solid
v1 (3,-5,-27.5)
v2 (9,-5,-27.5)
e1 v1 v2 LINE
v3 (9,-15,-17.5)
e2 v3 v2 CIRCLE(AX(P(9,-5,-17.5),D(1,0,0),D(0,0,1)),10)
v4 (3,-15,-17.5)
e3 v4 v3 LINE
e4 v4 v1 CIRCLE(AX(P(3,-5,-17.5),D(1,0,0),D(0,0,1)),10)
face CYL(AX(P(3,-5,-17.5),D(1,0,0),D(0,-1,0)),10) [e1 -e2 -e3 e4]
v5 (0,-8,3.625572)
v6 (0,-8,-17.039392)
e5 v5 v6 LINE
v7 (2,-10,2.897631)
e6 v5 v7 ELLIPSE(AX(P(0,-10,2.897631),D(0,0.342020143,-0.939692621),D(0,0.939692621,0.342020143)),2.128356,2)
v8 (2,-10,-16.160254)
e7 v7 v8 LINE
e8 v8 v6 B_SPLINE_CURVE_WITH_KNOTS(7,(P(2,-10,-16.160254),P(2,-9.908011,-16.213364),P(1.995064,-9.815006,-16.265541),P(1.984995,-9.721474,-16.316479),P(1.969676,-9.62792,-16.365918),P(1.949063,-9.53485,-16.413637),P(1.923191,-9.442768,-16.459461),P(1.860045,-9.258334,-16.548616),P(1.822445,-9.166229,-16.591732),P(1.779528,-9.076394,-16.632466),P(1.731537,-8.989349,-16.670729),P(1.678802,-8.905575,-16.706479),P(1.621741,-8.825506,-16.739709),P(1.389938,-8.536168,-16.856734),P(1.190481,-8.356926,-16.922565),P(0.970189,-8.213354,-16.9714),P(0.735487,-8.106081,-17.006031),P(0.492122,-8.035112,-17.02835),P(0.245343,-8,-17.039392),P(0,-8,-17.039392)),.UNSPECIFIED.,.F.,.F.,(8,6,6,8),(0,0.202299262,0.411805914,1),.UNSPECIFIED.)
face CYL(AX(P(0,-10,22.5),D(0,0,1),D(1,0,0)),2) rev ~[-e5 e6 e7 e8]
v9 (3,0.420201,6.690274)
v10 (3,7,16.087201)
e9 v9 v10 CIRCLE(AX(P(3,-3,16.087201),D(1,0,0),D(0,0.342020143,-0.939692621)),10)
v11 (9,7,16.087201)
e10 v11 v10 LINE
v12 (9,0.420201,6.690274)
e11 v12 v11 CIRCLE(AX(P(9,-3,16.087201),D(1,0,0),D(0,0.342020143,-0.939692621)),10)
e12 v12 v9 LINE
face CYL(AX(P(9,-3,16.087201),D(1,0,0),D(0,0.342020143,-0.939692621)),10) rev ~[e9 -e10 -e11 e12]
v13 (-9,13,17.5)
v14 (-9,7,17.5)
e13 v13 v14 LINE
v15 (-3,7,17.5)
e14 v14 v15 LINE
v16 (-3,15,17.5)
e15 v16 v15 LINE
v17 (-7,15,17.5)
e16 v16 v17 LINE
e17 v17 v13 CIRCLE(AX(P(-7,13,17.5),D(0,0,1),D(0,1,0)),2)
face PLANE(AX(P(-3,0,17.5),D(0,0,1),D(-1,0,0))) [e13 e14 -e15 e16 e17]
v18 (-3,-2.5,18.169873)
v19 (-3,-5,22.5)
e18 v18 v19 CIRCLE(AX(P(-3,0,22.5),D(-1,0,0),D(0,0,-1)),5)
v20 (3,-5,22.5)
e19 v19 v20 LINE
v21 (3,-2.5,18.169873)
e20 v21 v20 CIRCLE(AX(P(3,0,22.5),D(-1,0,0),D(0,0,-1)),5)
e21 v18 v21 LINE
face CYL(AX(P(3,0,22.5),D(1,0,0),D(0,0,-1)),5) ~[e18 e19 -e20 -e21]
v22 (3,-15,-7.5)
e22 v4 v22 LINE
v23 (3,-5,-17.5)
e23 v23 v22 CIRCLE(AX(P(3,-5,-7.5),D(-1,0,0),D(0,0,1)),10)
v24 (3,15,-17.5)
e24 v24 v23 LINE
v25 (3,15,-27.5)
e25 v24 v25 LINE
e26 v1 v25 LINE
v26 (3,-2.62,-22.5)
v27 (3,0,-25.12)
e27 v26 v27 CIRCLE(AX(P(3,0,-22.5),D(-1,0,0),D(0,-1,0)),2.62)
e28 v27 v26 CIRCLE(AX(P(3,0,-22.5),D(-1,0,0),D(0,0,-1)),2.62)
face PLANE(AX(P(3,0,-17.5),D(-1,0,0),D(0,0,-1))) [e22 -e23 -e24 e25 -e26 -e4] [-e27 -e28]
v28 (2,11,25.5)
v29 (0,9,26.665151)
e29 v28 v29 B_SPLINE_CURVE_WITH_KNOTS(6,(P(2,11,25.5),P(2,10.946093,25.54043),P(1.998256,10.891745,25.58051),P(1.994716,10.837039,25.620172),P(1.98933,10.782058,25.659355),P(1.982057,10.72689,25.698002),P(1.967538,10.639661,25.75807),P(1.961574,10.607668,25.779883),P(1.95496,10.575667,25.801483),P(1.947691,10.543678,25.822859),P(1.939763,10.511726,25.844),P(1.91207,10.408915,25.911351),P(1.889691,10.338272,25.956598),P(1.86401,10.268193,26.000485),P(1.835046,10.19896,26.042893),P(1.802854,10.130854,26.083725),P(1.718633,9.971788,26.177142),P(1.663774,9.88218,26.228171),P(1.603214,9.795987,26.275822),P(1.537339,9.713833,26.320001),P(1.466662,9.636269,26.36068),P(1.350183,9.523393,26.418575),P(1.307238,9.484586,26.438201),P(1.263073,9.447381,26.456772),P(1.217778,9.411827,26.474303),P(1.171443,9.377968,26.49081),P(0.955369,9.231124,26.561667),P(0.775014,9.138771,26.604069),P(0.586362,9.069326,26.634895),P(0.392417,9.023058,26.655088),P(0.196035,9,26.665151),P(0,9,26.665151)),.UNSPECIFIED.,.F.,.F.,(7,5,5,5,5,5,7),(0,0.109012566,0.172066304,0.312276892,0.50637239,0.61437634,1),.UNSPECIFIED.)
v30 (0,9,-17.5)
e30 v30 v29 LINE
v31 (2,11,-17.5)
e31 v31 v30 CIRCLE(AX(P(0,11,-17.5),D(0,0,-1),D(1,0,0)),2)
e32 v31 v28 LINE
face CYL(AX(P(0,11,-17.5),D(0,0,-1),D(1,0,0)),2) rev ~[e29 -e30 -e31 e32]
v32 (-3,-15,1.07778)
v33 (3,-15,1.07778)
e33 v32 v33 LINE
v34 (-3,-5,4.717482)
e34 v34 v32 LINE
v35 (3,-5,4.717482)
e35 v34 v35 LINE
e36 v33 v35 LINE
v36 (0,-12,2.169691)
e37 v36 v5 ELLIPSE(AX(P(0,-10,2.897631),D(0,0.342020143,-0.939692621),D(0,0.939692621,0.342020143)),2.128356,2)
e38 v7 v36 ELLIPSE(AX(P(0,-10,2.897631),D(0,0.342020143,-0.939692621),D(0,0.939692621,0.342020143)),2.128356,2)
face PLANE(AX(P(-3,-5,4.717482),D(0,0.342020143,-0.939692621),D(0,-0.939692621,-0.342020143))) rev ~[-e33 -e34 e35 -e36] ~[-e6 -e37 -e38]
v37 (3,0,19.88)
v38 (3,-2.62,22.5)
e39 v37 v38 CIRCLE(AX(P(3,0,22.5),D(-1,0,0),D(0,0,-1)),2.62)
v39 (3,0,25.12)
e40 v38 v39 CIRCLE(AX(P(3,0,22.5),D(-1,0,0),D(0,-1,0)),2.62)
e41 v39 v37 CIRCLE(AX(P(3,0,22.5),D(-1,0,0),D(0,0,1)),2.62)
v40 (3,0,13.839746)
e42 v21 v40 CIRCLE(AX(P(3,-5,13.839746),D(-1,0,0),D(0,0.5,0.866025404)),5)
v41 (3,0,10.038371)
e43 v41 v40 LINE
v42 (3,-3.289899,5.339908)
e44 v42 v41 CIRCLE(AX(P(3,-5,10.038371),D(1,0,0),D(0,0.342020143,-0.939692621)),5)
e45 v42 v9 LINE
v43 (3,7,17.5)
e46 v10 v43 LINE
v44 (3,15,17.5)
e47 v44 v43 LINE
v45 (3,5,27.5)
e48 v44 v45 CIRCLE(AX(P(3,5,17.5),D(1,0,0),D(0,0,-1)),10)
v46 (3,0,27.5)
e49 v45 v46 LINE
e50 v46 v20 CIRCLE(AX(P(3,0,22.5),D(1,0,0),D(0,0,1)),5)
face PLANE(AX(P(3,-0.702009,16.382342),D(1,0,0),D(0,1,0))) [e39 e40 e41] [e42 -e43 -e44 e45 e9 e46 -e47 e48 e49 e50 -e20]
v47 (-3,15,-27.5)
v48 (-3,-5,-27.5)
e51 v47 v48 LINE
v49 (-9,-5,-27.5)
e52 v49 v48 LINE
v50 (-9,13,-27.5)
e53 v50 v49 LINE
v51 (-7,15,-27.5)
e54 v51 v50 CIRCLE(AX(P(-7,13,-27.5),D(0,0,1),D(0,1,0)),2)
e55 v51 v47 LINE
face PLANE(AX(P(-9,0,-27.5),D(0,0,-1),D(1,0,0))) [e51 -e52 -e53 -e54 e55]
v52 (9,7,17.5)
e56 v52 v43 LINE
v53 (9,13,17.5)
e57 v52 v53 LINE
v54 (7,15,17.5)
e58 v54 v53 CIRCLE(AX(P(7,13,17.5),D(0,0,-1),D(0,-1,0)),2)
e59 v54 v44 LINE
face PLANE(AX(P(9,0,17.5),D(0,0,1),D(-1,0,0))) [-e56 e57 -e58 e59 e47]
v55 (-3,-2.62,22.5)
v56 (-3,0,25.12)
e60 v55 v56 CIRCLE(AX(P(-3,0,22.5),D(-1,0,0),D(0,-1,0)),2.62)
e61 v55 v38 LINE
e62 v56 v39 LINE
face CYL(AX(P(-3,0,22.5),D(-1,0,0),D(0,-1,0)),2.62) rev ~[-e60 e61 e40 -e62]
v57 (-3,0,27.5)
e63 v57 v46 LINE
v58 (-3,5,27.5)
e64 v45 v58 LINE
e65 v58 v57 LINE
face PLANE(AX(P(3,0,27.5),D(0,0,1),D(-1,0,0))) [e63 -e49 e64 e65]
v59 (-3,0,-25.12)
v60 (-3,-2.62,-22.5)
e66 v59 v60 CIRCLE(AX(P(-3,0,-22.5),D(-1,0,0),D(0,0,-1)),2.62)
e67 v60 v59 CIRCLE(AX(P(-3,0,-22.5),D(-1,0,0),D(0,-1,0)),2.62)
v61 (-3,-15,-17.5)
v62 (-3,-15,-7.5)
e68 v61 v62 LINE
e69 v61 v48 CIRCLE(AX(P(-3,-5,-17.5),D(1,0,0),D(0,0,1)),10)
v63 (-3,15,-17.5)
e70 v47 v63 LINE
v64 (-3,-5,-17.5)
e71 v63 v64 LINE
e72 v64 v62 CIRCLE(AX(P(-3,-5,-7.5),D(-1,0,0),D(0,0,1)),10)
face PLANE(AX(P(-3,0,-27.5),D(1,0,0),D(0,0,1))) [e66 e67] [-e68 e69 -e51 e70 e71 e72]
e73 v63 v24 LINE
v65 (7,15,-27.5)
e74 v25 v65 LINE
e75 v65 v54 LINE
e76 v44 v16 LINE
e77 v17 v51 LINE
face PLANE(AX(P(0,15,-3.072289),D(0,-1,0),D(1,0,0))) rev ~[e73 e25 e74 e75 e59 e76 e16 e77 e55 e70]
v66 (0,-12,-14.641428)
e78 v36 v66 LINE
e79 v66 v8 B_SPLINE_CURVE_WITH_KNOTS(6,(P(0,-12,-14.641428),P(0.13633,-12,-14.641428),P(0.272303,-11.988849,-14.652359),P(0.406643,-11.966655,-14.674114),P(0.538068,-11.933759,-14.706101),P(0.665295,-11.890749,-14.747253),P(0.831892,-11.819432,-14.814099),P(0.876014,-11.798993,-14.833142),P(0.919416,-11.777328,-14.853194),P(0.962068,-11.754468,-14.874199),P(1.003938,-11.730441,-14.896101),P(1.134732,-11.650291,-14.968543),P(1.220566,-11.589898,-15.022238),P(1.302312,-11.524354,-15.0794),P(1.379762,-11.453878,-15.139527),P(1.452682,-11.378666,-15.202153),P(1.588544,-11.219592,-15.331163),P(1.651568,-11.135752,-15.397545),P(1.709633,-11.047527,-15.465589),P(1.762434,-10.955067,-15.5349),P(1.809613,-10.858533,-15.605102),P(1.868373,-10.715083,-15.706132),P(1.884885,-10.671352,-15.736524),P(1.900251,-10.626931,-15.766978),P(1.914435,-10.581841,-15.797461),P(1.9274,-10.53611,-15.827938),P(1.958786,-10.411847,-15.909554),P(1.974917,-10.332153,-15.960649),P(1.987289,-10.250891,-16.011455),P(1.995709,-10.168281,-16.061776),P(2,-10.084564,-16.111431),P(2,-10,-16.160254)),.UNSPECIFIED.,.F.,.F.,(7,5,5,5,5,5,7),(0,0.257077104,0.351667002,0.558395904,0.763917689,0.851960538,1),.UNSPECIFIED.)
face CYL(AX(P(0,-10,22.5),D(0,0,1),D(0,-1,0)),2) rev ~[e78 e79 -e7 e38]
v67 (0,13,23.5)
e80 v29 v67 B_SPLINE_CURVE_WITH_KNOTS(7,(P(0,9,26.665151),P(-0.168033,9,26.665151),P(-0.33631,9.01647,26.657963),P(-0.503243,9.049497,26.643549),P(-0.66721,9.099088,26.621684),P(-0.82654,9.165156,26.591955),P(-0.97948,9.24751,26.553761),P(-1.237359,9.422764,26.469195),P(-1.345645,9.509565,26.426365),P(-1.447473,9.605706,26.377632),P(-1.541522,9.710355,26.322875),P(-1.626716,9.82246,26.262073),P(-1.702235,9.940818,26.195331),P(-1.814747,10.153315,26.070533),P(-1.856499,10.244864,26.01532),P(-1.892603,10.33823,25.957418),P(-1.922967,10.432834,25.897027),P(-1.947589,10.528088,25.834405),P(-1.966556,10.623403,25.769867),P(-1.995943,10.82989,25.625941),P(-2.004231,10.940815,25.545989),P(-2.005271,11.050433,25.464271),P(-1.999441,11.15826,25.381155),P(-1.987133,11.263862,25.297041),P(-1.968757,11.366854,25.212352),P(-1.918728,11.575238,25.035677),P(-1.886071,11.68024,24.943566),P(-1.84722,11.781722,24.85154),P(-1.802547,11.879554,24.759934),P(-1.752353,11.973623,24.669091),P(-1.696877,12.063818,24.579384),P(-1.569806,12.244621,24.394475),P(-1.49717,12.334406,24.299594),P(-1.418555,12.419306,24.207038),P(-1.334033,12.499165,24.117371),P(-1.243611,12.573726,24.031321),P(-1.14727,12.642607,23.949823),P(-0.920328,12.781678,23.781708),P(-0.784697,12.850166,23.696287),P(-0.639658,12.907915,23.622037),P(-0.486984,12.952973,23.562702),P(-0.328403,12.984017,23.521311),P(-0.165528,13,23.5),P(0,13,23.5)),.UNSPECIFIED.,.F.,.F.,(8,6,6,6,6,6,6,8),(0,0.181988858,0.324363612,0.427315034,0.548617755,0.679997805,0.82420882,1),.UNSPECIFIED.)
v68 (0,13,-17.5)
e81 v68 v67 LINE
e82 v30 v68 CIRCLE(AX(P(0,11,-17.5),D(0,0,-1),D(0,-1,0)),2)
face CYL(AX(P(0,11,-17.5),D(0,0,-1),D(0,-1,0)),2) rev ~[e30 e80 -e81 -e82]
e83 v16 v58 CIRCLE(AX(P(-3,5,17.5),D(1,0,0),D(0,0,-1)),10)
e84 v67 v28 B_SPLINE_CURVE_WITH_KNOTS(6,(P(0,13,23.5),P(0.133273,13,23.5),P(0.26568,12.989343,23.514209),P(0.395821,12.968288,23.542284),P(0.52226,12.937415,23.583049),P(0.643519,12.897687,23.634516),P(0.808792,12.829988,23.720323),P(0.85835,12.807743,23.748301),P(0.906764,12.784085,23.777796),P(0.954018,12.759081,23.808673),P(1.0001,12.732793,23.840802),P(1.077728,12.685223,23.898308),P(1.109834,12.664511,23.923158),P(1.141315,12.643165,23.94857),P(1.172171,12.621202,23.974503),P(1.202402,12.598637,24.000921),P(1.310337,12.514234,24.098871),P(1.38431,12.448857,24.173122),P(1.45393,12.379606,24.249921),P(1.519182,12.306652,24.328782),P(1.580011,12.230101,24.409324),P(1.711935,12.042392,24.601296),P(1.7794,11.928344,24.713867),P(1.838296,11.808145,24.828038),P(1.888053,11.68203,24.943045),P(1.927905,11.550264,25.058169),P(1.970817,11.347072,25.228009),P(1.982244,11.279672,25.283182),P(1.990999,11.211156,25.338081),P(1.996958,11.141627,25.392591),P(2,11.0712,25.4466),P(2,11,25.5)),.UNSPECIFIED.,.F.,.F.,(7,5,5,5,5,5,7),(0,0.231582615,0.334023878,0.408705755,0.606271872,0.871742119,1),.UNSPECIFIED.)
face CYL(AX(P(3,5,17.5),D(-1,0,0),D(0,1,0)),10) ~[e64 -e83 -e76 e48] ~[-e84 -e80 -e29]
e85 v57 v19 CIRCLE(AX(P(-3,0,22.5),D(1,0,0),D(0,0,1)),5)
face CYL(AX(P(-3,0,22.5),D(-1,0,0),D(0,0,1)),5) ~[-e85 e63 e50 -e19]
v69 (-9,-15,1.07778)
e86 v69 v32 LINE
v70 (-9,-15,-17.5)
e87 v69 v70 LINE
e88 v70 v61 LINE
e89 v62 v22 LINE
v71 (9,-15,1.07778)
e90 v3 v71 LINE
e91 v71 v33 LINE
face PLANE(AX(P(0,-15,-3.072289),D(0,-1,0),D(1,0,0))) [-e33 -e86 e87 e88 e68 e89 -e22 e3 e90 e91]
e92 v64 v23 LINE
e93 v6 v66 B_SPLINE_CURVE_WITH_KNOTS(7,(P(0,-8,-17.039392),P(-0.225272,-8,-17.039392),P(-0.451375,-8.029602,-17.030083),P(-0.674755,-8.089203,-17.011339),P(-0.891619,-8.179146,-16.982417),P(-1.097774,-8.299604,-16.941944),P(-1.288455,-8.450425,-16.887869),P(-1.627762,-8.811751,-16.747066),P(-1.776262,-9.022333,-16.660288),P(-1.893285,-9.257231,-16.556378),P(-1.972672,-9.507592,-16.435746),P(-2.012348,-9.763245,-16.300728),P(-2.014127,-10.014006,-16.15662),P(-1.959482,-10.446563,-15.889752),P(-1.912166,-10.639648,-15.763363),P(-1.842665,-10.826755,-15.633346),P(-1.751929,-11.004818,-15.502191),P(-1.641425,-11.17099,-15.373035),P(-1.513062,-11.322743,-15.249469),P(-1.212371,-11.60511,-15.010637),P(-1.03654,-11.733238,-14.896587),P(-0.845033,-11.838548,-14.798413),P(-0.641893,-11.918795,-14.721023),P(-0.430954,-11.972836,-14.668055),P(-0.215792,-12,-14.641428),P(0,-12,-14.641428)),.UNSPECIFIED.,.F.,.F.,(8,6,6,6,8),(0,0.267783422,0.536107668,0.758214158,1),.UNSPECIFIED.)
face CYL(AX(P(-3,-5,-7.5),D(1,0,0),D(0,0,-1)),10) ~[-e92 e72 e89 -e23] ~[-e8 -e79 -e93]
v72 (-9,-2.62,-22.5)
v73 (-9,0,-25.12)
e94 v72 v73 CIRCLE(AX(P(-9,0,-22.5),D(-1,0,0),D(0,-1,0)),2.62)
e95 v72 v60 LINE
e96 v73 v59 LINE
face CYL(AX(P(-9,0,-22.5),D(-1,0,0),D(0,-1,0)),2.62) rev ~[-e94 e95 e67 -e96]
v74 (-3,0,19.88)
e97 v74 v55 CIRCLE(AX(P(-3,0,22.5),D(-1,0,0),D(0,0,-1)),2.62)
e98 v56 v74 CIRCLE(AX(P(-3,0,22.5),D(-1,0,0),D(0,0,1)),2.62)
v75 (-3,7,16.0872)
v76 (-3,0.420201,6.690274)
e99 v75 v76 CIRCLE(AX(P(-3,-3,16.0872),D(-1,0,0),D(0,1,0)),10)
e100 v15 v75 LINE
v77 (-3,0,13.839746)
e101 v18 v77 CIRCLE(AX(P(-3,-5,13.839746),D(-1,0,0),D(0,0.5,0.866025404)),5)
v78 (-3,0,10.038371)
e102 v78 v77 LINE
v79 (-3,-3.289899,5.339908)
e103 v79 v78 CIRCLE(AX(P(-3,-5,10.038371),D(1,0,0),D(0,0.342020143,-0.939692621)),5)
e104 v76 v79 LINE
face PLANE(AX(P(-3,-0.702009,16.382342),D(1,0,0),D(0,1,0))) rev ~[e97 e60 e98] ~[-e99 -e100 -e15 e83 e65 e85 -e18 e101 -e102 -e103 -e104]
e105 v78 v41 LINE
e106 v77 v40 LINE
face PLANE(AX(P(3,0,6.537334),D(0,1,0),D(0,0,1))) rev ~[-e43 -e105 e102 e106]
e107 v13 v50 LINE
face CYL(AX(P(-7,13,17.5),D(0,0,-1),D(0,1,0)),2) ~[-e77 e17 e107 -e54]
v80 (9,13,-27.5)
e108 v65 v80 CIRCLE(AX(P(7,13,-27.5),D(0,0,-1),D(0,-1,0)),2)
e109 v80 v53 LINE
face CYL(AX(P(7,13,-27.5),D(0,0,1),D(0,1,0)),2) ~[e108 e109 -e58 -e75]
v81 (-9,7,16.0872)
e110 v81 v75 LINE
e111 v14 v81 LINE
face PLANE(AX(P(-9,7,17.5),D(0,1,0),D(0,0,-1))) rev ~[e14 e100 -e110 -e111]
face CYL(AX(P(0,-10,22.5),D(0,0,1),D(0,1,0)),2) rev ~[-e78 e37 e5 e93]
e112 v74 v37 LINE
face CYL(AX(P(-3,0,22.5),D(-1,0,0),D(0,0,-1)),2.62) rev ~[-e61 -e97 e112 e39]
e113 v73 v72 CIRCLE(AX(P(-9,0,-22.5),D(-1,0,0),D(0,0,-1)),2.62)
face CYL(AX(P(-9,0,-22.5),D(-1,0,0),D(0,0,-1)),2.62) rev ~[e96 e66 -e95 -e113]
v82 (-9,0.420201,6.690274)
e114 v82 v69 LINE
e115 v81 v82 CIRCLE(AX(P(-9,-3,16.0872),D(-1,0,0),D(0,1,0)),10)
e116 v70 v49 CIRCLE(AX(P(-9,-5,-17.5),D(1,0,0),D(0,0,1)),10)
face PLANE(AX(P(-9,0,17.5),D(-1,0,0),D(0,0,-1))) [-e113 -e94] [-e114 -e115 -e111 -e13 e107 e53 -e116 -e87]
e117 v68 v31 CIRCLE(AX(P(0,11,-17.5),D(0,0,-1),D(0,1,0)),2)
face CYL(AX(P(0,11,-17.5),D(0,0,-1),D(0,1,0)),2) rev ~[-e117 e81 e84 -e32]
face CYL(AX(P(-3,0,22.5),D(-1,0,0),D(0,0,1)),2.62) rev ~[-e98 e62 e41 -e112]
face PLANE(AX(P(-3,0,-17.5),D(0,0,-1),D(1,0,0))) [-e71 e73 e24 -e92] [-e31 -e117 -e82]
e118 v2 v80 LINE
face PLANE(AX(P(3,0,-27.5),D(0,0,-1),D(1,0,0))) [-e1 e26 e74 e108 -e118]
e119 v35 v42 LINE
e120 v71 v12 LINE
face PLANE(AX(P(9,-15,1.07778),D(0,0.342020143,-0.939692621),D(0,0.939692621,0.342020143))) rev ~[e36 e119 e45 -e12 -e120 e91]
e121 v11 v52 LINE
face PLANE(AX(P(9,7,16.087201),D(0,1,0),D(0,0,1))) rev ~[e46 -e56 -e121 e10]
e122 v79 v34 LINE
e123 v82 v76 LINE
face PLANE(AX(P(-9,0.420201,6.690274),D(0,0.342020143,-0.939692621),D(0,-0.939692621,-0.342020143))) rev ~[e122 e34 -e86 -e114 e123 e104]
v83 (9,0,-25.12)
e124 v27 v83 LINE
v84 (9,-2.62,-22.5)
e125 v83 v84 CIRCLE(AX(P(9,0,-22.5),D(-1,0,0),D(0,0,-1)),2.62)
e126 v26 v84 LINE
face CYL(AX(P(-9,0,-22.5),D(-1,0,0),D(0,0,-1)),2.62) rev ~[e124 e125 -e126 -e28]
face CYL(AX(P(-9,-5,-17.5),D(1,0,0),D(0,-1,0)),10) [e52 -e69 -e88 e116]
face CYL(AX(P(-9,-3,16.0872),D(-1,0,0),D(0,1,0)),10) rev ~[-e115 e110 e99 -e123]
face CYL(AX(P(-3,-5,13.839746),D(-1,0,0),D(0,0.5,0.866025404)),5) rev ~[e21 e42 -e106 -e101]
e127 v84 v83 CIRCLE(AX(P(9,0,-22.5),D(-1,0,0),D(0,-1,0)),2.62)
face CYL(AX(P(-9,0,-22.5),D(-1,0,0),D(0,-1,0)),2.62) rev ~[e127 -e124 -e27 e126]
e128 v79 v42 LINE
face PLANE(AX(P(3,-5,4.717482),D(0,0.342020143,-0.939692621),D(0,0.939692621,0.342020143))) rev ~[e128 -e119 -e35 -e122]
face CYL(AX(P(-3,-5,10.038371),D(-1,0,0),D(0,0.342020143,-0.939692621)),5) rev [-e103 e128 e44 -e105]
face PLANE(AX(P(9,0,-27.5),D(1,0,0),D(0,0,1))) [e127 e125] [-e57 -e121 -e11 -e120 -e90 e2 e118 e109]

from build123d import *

# Parameters (mm, degrees)
F1_DEPTH     = 15
F3_DEPTH     = 6
F5_DEPTH     = 18
F6_R         = 10
F9_DEPTH     = 6
F10_DEPTH    = 6
F11_R        = 2
F13_DEPTH    = 6
F15_R        = 10
F19_DEPTH    = 50.001
F21_DEPTH    = 45.001
F23_DEPTH    = 6
F24_T1_DEPTH = 6


# Not quite as in the source:
# - a fillet or chamfer that OpenCascade refuses, or shapes differently, is made with other operations: its cross-section is extruded or revolved along the edge and cut away or added


with BuildPart() as f1:
    # F0 (on Front) → F1 (new body, symmetric)
    with BuildSketch(Plane.XZ):
        Polygon((9, -17.5), (9, 17.5), (3, 17.5), (3, 27.5), (-3, 27.5), (-3, 17.5), (-9, 17.5), (-9, -17.5), (-9, -27.5), (-3, -27.5), (-3, -17.5), (3, -17.5), (3, -27.5), (9, -27.5), align=None)
    extrude(amount=F1_DEPTH, both=True)

    # F2 (on face) → F3 (cut)
    with BuildSketch(Plane(origin=(-3, 0, 0), x_dir=(0, -1, 0), z_dir=(-1, 0, 0))):
        with BuildLine():
            ThreePointArc((0, 25.12), (-2.62, 22.5), (0, 19.88))
            Line((0, 19.88), (0, 25.12))
        make_face()
        with BuildLine():
            Line((0, 25.12), (0, 19.88))
            ThreePointArc((0, 19.88), (1.8526197667, 20.6473802333), (2.62, 22.5))
            ThreePointArc((2.62, 22.5), (1.8526197667, 24.3526197667), (0, 25.12))
        make_face()
    extrude(amount=-F3_DEPTH, mode=Mode.SUBTRACT)

    # F4 (on face) → F5 (cut)
    with BuildSketch(Plane(origin=(-9, 0, 0), x_dir=(0, -1, 0), z_dir=(-1, 0, 0))):
        with BuildLine():
            ThreePointArc((0, -25.12), (1.8526197667, -24.3526197667), (2.62, -22.5))
            ThreePointArc((2.62, -22.5), (-1.8526197667, -20.6473802333), (0, -25.12))
        make_face()
    extrude(amount=-F5_DEPTH, mode=Mode.SUBTRACT)

    # F6
    f6_edges = [f1.edges().sort_by_distance(p)[0] for p in [
        (0, 15, 27.5),
        (0, -15, 27.5),
        (6, -15, -27.5),
        (-6, -15, -27.5),
    ]]
    fillet(f6_edges, radius=F6_R)

    # F8 (on face) → F9 (cut)
    with BuildSketch(Plane(origin=(-9, 0, 0), x_dir=(0, -1, 0), z_dir=(-1, 0, 0))):
        with BuildLine():
            ThreePointArc((-7, 16.0872004348), (-5.1915204429, 10.3514360713), (-0.4202014333, 6.690274227))
            Line((-0.4202014333, 6.690274227), (15, 1.0777798989))
            Line((15, 1.0777798989), (15, 17.5))
            Line((15, 17.5), (-7, 17.5))
            Line((-7, 17.5), (-7, 16.0872004348))
        make_face()
    extrude(amount=-F9_DEPTH, mode=Mode.SUBTRACT)

    # F7 (on face) → F10 (cut)
    with BuildSketch(Plane.YZ.offset(9)):
        with BuildLine():
            Line((7, 17.5), (-15, 17.5))
            Line((-15, 17.5), (-15, 1.07778))
            Line((-15, 1.07778), (0.4202014333, 6.6902743281))
            ThreePointArc((0.4202014333, 6.6902743281), (5.1915204429, 10.3514361724), (7, 16.087200536))
            Line((7, 16.087200536), (7, 17.5))
        make_face()
    extrude(amount=-F10_DEPTH, mode=Mode.SUBTRACT)

    # F11
    f11_edges = [f1.edges().sort_by_distance(p)[0] for p in [
        (9, 15, -5),
        (-9, 15, -5),
    ]]
    fillet(f11_edges, radius=F11_R)

    # F12 (on face) → F13 (cut)
    with BuildSketch(Plane(origin=(-3, 0, 0), x_dir=(0, -1, 0), z_dir=(-1, 0, 0))):
        with BuildLine():
            Line((5, 27.5), (0, 27.5))
            ThreePointArc((0, 27.5), (3.5355339059, 26.0355339059), (5, 22.5))
            Line((5, 22.5), (5, 4.7174822415))
            Line((5, 4.7174822415), (15, 1.0777798989))
            Line((15, 1.0777798989), (15, 17.5))
            ThreePointArc((15, 17.5), (12.0710678119, 24.5710678119), (5, 27.5))
        make_face()
    extrude(amount=-F13_DEPTH, mode=Mode.SUBTRACT)

    # F15
    f15_edges = [f1.edges().sort_by_distance(p)[0] for p in [
        (0, -15, -17.5),
    ]]
    fillet(f15_edges, radius=F15_R)

    # F18 (on face) → F19 (cut, through all)
    with BuildSketch(Plane.XY.offset(22.5)):
        with BuildLine():
            ThreePointArc((2, -10), (1.4142135624, -8.5857864376), (0, -8))
            Line((0, -8), (0, -12))
            ThreePointArc((0, -12), (1.4142135624, -11.4142135624), (2, -10))
        make_face()
        with BuildLine():
            Line((0, -12), (0, -8))
            ThreePointArc((0, -8), (-2, -10), (0, -12))
        make_face()
    extrude(amount=-F19_DEPTH, mode=Mode.SUBTRACT)

    # F20 (on face) → F21 (cut, through all)
    with BuildSketch(Plane(origin=(0, 0, -17.5), x_dir=(1, 0, 0), z_dir=(0, 0, -1))):
        with BuildLine():
            ThreePointArc((0, -9), (-2, -11), (0, -13))
            Line((0, -13), (0, -11))
            Line((0, -11), (0, -9))
        make_face()
        with BuildLine():
            Line((0, -11), (0, -13))
            ThreePointArc((0, -13), (1.4142135624, -12.4142135624), (2, -11))
            ThreePointArc((2, -11), (1.4142135624, -9.5857864376), (0, -9))
            Line((0, -9), (0, -11))
        make_face()
    extrude(amount=-F21_DEPTH, mode=Mode.SUBTRACT)

    # F22 (on face) → F23 (cut)
    with BuildSketch(Plane.YZ.offset(3)):
        with BuildLine():
            ThreePointArc((0, 17.5), (-3.5355339059, 18.9644660941), (-5, 22.5))
            Line((-5, 22.5), (-5, 4.7174822415))
            Line((-5.0000000325, 4.7174823308), (0, 6.537333514))
            Line((0, 6.537333514), (0, 17.5))
        make_face()
    extrude(amount=-F23_DEPTH, mode=Mode.SUBTRACT)

    # F24: fillet of radius 5 on 2 edges, made by hand

    # F24_s2 → F24_t1 (join)
    with BuildSketch(Plane.YZ.offset(-3)):
        with BuildLine():
            ThreePointArc((-2.5, 18.1698729811), (-0.6698729811, 16.3397459622), (0, 13.8397459622))
            Line((0, 13.8397459622), (0, 17.5))
            ThreePointArc((0, 17.5), (-1.2940952255, 17.6703708686), (-2.5, 18.1698729811))
        make_face()
        with BuildLine():
            ThreePointArc((-3.2898992834, 5.3399081011), (-0.9042397786, 7.1704890233), (0, 10.038371205))
            Line((0, 10.038371205), (0, 6.537333514))
            Line((0, 6.537333514), (-3.2898992834, 5.3399081011))
        make_face()
    extrude(amount=F24_T1_DEPTH)


solid = f1.part
